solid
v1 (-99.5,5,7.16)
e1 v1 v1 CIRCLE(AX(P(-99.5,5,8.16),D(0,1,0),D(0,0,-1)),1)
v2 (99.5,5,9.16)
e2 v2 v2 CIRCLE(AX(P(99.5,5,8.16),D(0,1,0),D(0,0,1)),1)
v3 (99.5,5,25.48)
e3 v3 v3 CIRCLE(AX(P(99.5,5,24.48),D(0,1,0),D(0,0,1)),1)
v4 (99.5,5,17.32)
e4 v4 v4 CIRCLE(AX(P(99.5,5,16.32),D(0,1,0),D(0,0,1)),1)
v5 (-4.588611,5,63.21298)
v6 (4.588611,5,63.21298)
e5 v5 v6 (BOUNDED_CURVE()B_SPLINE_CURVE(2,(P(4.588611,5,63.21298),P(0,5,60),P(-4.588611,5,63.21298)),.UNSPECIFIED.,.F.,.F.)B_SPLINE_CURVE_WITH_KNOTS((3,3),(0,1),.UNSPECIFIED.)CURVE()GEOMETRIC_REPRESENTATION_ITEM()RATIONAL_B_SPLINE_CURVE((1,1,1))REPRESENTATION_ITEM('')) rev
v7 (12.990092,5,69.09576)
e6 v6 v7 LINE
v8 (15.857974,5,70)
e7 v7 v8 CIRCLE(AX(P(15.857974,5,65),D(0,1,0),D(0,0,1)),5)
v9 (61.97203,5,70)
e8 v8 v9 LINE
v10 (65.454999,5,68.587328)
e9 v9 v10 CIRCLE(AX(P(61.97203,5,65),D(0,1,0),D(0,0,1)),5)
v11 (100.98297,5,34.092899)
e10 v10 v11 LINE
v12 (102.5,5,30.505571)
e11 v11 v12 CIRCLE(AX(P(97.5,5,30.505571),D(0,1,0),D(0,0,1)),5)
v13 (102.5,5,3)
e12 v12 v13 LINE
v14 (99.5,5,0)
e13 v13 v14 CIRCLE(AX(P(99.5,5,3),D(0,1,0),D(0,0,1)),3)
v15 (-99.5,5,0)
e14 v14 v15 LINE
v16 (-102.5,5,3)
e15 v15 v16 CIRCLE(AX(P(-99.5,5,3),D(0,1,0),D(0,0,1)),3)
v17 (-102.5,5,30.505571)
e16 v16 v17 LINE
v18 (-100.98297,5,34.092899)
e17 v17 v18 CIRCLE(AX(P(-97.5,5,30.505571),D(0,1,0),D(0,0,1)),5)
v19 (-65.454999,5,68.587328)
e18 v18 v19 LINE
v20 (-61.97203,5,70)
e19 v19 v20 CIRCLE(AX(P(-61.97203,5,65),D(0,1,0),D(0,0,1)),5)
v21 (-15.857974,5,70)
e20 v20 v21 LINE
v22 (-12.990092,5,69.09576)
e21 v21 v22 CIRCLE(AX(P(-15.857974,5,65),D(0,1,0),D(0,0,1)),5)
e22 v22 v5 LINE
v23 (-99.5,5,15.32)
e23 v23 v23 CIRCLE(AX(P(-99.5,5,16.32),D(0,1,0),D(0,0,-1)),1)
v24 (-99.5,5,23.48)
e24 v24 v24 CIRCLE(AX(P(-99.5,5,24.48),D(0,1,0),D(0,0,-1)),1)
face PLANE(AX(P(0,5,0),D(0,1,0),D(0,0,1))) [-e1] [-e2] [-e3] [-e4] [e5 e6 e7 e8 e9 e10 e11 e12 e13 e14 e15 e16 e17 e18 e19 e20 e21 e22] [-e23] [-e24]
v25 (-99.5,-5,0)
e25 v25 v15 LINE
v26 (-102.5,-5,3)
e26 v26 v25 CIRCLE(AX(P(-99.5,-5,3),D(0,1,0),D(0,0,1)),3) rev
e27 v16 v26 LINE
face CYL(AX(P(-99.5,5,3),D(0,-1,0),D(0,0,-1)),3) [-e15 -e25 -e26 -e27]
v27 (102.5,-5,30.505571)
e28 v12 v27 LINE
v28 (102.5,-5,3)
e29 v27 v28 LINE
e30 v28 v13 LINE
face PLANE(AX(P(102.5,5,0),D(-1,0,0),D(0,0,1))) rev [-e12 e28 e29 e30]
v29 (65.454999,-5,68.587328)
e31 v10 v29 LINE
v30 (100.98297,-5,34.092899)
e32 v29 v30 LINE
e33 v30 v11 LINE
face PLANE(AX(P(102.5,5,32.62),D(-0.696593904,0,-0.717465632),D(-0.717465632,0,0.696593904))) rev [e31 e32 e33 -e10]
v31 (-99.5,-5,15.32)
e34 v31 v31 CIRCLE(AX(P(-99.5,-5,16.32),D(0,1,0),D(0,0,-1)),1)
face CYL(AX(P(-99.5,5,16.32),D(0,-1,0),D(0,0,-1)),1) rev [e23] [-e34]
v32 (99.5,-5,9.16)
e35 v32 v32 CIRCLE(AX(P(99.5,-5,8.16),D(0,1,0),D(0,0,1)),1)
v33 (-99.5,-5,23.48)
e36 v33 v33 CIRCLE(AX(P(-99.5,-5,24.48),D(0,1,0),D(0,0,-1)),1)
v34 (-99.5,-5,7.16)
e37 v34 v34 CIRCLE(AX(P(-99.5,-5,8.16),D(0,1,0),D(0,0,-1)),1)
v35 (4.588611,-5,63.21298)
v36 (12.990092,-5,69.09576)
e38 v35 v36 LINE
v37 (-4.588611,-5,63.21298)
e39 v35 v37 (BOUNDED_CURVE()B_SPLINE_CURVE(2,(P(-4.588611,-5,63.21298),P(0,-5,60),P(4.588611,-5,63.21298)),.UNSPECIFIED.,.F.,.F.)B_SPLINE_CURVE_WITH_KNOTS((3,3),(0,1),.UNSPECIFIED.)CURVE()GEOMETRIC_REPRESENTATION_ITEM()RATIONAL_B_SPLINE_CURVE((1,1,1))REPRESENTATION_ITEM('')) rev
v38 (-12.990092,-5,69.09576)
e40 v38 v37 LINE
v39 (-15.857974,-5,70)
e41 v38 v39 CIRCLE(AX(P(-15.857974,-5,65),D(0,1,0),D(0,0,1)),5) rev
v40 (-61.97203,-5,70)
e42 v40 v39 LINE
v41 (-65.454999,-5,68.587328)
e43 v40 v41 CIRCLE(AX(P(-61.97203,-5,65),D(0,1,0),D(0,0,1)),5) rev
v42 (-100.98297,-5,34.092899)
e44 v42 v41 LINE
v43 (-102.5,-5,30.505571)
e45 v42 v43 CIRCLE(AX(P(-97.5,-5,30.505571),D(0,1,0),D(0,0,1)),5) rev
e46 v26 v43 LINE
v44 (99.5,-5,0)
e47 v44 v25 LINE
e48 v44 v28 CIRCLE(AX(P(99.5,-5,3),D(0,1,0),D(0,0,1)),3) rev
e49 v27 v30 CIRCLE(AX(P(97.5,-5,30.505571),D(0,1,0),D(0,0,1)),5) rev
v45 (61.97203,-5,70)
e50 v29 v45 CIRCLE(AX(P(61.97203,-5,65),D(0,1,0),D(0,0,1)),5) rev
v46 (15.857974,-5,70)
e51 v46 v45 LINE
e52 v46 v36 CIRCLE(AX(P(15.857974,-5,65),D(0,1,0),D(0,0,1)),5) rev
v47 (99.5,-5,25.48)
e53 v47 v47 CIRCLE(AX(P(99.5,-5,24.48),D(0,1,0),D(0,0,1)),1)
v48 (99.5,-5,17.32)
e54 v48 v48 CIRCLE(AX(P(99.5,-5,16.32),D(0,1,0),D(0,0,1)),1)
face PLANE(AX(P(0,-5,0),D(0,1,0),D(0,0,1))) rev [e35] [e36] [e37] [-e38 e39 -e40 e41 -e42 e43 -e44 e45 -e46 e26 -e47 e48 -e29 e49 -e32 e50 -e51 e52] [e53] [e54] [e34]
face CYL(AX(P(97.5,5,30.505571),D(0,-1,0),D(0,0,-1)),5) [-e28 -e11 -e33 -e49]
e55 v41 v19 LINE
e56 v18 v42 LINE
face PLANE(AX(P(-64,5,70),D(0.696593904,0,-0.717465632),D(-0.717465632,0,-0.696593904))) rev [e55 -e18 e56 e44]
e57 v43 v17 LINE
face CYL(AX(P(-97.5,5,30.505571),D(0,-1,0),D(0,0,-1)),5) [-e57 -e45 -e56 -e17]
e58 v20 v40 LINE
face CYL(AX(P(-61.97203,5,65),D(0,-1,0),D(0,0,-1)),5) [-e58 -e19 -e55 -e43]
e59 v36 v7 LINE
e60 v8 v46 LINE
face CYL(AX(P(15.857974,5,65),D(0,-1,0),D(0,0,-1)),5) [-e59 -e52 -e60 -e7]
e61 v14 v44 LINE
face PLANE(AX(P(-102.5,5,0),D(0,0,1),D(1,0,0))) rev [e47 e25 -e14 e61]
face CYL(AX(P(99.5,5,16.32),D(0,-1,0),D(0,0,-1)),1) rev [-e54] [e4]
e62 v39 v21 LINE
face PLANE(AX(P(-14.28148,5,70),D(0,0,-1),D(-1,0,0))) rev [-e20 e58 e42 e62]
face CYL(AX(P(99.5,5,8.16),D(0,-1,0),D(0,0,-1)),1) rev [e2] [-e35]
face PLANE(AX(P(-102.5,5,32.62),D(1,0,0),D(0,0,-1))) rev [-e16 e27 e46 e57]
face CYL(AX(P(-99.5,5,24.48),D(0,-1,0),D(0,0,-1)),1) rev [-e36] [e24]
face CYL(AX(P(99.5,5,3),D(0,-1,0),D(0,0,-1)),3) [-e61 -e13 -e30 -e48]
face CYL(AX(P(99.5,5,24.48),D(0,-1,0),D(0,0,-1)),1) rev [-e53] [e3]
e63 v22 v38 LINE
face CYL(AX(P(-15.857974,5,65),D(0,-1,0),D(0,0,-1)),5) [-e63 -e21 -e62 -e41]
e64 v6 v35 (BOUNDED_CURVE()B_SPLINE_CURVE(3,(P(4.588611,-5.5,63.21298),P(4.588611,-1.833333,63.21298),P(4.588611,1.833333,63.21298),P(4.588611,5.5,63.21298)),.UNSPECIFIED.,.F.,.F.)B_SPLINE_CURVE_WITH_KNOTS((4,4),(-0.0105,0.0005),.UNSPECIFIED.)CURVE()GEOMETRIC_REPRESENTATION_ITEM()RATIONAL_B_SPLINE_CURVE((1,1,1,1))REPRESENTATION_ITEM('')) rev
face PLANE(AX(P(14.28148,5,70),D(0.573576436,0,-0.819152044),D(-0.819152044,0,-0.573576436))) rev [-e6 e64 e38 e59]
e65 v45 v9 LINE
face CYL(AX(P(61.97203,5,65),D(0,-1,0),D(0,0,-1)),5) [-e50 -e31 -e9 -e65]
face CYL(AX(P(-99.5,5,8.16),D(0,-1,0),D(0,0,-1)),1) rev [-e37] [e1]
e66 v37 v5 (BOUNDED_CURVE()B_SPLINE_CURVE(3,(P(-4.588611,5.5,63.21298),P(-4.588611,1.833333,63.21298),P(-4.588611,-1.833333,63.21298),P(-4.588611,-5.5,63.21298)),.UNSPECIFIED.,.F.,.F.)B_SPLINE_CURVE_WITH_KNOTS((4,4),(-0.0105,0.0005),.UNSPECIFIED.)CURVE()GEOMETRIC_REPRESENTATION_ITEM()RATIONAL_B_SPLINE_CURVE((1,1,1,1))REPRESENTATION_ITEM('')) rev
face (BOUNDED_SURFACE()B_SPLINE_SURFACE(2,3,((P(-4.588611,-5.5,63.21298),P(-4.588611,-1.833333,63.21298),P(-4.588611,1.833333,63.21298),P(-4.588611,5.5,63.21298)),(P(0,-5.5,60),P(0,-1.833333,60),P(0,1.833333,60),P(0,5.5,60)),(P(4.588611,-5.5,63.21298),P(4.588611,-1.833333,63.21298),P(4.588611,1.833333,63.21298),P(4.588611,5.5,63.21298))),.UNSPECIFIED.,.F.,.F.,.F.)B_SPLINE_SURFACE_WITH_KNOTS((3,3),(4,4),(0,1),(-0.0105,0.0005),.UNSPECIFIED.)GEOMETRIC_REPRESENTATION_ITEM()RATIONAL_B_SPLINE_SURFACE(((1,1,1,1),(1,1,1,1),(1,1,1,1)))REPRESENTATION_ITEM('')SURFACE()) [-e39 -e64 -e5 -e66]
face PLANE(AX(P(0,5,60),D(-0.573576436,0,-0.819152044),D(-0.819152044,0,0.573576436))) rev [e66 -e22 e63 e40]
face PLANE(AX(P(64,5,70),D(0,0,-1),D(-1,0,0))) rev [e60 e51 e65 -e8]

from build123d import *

# Parameters (mm, degrees)
SKETCH1_R           = 1
BOSS_EXTRUDE1_DEPTH = 5
FILLET1_R           = 5
FILLET2_R           = 5
FILLET3_R           = 5
FILLET4_R           = 3


with BuildPart() as part:
    # Sketch1 → Boss-Extrude1 (new, symmetric)
    with BuildSketch(Plane(origin=(0, 0, 0), x_dir=(1, 0, 0), z_dir=(0, 1, 0))):
        Polygon((0, -60), (-14.281480067, -70), (-64, -70), (-102.5, -32.62), (-102.5, 0), (102.5, 0), (102.5, -32.62), (64, -70), (14.281480067, -70), align=None)
        with Locations(Location((99.5, -8.16, 0), (0, 0, 270))):
            Circle(SKETCH1_R, mode=Mode.SUBTRACT)
        with Locations(Location((99.5, -16.32, 0), (0, 0, 270))):
            Circle(SKETCH1_R, mode=Mode.SUBTRACT)
        with Locations(Location((99.5, -24.48, 0), (0, 0, 270))):
            Circle(SKETCH1_R, mode=Mode.SUBTRACT)
        with Locations(Location((-99.5, -24.48, 0), (0, 0, 90))):
            Circle(SKETCH1_R, mode=Mode.SUBTRACT)
        with Locations(Location((-99.5, -16.32, 0), (0, 0, 90))):
            Circle(SKETCH1_R, mode=Mode.SUBTRACT)
        with Locations(Location((-99.5, -8.16, 0), (0, 0, 90))):
            Circle(SKETCH1_R, mode=Mode.SUBTRACT)
    extrude(amount=BOSS_EXTRUDE1_DEPTH, both=True)

    # Fillet1
    fillet1_edges = [part.edges().sort_by_distance(p)[0] for p in [
        (-14.281480067, 0, 70),
        (14.281480067, 0, 70),
    ]]
    fillet(fillet1_edges, radius=FILLET1_R)

    # Fillet2
    fillet2_edges = [part.edges().sort_by_distance(p)[0] for p in [
        (-64, 0, 70),
        (64, 0, 70),
    ]]
    fillet(fillet2_edges, radius=FILLET2_R)

    # Fillet3
    fillet3_edges = [part.edges().sort_by_distance(p)[0] for p in [
        (-102.5, 0, 32.62),
        (102.5, 0, 32.62),
    ]]
    fillet(fillet3_edges, radius=FILLET3_R)

    # Fillet4
    fillet4_edges = [part.edges().sort_by_distance(p)[0] for p in [
        (-102.5, 0, 0),
        (102.5, 0, 0),
    ]]
    fillet(fillet4_edges, radius=FILLET4_R)

    # Fillet5
    # a fillet whose section is not a circle: 8 mm, written as the material it adds along each edge
    with BuildSketch(Plane(origin=(0, -5, 60), x_dir=(-0.8191520442889911, 0, 0.5735764363510473), z_dir=(0, 1, 0))) as fillet5_piece_1:
        with BuildLine():
            Bezier((5.601660306, 0), (0, 0), (-1.915880661, 5.263838853), weights=[1, 1, 1])
            Line((-1.915880661, 5.263838853), (0, 0))
            Line((0, 0), (5.601660306, 0))
        make_face()
    extrude(amount=10)


solid = part.part
